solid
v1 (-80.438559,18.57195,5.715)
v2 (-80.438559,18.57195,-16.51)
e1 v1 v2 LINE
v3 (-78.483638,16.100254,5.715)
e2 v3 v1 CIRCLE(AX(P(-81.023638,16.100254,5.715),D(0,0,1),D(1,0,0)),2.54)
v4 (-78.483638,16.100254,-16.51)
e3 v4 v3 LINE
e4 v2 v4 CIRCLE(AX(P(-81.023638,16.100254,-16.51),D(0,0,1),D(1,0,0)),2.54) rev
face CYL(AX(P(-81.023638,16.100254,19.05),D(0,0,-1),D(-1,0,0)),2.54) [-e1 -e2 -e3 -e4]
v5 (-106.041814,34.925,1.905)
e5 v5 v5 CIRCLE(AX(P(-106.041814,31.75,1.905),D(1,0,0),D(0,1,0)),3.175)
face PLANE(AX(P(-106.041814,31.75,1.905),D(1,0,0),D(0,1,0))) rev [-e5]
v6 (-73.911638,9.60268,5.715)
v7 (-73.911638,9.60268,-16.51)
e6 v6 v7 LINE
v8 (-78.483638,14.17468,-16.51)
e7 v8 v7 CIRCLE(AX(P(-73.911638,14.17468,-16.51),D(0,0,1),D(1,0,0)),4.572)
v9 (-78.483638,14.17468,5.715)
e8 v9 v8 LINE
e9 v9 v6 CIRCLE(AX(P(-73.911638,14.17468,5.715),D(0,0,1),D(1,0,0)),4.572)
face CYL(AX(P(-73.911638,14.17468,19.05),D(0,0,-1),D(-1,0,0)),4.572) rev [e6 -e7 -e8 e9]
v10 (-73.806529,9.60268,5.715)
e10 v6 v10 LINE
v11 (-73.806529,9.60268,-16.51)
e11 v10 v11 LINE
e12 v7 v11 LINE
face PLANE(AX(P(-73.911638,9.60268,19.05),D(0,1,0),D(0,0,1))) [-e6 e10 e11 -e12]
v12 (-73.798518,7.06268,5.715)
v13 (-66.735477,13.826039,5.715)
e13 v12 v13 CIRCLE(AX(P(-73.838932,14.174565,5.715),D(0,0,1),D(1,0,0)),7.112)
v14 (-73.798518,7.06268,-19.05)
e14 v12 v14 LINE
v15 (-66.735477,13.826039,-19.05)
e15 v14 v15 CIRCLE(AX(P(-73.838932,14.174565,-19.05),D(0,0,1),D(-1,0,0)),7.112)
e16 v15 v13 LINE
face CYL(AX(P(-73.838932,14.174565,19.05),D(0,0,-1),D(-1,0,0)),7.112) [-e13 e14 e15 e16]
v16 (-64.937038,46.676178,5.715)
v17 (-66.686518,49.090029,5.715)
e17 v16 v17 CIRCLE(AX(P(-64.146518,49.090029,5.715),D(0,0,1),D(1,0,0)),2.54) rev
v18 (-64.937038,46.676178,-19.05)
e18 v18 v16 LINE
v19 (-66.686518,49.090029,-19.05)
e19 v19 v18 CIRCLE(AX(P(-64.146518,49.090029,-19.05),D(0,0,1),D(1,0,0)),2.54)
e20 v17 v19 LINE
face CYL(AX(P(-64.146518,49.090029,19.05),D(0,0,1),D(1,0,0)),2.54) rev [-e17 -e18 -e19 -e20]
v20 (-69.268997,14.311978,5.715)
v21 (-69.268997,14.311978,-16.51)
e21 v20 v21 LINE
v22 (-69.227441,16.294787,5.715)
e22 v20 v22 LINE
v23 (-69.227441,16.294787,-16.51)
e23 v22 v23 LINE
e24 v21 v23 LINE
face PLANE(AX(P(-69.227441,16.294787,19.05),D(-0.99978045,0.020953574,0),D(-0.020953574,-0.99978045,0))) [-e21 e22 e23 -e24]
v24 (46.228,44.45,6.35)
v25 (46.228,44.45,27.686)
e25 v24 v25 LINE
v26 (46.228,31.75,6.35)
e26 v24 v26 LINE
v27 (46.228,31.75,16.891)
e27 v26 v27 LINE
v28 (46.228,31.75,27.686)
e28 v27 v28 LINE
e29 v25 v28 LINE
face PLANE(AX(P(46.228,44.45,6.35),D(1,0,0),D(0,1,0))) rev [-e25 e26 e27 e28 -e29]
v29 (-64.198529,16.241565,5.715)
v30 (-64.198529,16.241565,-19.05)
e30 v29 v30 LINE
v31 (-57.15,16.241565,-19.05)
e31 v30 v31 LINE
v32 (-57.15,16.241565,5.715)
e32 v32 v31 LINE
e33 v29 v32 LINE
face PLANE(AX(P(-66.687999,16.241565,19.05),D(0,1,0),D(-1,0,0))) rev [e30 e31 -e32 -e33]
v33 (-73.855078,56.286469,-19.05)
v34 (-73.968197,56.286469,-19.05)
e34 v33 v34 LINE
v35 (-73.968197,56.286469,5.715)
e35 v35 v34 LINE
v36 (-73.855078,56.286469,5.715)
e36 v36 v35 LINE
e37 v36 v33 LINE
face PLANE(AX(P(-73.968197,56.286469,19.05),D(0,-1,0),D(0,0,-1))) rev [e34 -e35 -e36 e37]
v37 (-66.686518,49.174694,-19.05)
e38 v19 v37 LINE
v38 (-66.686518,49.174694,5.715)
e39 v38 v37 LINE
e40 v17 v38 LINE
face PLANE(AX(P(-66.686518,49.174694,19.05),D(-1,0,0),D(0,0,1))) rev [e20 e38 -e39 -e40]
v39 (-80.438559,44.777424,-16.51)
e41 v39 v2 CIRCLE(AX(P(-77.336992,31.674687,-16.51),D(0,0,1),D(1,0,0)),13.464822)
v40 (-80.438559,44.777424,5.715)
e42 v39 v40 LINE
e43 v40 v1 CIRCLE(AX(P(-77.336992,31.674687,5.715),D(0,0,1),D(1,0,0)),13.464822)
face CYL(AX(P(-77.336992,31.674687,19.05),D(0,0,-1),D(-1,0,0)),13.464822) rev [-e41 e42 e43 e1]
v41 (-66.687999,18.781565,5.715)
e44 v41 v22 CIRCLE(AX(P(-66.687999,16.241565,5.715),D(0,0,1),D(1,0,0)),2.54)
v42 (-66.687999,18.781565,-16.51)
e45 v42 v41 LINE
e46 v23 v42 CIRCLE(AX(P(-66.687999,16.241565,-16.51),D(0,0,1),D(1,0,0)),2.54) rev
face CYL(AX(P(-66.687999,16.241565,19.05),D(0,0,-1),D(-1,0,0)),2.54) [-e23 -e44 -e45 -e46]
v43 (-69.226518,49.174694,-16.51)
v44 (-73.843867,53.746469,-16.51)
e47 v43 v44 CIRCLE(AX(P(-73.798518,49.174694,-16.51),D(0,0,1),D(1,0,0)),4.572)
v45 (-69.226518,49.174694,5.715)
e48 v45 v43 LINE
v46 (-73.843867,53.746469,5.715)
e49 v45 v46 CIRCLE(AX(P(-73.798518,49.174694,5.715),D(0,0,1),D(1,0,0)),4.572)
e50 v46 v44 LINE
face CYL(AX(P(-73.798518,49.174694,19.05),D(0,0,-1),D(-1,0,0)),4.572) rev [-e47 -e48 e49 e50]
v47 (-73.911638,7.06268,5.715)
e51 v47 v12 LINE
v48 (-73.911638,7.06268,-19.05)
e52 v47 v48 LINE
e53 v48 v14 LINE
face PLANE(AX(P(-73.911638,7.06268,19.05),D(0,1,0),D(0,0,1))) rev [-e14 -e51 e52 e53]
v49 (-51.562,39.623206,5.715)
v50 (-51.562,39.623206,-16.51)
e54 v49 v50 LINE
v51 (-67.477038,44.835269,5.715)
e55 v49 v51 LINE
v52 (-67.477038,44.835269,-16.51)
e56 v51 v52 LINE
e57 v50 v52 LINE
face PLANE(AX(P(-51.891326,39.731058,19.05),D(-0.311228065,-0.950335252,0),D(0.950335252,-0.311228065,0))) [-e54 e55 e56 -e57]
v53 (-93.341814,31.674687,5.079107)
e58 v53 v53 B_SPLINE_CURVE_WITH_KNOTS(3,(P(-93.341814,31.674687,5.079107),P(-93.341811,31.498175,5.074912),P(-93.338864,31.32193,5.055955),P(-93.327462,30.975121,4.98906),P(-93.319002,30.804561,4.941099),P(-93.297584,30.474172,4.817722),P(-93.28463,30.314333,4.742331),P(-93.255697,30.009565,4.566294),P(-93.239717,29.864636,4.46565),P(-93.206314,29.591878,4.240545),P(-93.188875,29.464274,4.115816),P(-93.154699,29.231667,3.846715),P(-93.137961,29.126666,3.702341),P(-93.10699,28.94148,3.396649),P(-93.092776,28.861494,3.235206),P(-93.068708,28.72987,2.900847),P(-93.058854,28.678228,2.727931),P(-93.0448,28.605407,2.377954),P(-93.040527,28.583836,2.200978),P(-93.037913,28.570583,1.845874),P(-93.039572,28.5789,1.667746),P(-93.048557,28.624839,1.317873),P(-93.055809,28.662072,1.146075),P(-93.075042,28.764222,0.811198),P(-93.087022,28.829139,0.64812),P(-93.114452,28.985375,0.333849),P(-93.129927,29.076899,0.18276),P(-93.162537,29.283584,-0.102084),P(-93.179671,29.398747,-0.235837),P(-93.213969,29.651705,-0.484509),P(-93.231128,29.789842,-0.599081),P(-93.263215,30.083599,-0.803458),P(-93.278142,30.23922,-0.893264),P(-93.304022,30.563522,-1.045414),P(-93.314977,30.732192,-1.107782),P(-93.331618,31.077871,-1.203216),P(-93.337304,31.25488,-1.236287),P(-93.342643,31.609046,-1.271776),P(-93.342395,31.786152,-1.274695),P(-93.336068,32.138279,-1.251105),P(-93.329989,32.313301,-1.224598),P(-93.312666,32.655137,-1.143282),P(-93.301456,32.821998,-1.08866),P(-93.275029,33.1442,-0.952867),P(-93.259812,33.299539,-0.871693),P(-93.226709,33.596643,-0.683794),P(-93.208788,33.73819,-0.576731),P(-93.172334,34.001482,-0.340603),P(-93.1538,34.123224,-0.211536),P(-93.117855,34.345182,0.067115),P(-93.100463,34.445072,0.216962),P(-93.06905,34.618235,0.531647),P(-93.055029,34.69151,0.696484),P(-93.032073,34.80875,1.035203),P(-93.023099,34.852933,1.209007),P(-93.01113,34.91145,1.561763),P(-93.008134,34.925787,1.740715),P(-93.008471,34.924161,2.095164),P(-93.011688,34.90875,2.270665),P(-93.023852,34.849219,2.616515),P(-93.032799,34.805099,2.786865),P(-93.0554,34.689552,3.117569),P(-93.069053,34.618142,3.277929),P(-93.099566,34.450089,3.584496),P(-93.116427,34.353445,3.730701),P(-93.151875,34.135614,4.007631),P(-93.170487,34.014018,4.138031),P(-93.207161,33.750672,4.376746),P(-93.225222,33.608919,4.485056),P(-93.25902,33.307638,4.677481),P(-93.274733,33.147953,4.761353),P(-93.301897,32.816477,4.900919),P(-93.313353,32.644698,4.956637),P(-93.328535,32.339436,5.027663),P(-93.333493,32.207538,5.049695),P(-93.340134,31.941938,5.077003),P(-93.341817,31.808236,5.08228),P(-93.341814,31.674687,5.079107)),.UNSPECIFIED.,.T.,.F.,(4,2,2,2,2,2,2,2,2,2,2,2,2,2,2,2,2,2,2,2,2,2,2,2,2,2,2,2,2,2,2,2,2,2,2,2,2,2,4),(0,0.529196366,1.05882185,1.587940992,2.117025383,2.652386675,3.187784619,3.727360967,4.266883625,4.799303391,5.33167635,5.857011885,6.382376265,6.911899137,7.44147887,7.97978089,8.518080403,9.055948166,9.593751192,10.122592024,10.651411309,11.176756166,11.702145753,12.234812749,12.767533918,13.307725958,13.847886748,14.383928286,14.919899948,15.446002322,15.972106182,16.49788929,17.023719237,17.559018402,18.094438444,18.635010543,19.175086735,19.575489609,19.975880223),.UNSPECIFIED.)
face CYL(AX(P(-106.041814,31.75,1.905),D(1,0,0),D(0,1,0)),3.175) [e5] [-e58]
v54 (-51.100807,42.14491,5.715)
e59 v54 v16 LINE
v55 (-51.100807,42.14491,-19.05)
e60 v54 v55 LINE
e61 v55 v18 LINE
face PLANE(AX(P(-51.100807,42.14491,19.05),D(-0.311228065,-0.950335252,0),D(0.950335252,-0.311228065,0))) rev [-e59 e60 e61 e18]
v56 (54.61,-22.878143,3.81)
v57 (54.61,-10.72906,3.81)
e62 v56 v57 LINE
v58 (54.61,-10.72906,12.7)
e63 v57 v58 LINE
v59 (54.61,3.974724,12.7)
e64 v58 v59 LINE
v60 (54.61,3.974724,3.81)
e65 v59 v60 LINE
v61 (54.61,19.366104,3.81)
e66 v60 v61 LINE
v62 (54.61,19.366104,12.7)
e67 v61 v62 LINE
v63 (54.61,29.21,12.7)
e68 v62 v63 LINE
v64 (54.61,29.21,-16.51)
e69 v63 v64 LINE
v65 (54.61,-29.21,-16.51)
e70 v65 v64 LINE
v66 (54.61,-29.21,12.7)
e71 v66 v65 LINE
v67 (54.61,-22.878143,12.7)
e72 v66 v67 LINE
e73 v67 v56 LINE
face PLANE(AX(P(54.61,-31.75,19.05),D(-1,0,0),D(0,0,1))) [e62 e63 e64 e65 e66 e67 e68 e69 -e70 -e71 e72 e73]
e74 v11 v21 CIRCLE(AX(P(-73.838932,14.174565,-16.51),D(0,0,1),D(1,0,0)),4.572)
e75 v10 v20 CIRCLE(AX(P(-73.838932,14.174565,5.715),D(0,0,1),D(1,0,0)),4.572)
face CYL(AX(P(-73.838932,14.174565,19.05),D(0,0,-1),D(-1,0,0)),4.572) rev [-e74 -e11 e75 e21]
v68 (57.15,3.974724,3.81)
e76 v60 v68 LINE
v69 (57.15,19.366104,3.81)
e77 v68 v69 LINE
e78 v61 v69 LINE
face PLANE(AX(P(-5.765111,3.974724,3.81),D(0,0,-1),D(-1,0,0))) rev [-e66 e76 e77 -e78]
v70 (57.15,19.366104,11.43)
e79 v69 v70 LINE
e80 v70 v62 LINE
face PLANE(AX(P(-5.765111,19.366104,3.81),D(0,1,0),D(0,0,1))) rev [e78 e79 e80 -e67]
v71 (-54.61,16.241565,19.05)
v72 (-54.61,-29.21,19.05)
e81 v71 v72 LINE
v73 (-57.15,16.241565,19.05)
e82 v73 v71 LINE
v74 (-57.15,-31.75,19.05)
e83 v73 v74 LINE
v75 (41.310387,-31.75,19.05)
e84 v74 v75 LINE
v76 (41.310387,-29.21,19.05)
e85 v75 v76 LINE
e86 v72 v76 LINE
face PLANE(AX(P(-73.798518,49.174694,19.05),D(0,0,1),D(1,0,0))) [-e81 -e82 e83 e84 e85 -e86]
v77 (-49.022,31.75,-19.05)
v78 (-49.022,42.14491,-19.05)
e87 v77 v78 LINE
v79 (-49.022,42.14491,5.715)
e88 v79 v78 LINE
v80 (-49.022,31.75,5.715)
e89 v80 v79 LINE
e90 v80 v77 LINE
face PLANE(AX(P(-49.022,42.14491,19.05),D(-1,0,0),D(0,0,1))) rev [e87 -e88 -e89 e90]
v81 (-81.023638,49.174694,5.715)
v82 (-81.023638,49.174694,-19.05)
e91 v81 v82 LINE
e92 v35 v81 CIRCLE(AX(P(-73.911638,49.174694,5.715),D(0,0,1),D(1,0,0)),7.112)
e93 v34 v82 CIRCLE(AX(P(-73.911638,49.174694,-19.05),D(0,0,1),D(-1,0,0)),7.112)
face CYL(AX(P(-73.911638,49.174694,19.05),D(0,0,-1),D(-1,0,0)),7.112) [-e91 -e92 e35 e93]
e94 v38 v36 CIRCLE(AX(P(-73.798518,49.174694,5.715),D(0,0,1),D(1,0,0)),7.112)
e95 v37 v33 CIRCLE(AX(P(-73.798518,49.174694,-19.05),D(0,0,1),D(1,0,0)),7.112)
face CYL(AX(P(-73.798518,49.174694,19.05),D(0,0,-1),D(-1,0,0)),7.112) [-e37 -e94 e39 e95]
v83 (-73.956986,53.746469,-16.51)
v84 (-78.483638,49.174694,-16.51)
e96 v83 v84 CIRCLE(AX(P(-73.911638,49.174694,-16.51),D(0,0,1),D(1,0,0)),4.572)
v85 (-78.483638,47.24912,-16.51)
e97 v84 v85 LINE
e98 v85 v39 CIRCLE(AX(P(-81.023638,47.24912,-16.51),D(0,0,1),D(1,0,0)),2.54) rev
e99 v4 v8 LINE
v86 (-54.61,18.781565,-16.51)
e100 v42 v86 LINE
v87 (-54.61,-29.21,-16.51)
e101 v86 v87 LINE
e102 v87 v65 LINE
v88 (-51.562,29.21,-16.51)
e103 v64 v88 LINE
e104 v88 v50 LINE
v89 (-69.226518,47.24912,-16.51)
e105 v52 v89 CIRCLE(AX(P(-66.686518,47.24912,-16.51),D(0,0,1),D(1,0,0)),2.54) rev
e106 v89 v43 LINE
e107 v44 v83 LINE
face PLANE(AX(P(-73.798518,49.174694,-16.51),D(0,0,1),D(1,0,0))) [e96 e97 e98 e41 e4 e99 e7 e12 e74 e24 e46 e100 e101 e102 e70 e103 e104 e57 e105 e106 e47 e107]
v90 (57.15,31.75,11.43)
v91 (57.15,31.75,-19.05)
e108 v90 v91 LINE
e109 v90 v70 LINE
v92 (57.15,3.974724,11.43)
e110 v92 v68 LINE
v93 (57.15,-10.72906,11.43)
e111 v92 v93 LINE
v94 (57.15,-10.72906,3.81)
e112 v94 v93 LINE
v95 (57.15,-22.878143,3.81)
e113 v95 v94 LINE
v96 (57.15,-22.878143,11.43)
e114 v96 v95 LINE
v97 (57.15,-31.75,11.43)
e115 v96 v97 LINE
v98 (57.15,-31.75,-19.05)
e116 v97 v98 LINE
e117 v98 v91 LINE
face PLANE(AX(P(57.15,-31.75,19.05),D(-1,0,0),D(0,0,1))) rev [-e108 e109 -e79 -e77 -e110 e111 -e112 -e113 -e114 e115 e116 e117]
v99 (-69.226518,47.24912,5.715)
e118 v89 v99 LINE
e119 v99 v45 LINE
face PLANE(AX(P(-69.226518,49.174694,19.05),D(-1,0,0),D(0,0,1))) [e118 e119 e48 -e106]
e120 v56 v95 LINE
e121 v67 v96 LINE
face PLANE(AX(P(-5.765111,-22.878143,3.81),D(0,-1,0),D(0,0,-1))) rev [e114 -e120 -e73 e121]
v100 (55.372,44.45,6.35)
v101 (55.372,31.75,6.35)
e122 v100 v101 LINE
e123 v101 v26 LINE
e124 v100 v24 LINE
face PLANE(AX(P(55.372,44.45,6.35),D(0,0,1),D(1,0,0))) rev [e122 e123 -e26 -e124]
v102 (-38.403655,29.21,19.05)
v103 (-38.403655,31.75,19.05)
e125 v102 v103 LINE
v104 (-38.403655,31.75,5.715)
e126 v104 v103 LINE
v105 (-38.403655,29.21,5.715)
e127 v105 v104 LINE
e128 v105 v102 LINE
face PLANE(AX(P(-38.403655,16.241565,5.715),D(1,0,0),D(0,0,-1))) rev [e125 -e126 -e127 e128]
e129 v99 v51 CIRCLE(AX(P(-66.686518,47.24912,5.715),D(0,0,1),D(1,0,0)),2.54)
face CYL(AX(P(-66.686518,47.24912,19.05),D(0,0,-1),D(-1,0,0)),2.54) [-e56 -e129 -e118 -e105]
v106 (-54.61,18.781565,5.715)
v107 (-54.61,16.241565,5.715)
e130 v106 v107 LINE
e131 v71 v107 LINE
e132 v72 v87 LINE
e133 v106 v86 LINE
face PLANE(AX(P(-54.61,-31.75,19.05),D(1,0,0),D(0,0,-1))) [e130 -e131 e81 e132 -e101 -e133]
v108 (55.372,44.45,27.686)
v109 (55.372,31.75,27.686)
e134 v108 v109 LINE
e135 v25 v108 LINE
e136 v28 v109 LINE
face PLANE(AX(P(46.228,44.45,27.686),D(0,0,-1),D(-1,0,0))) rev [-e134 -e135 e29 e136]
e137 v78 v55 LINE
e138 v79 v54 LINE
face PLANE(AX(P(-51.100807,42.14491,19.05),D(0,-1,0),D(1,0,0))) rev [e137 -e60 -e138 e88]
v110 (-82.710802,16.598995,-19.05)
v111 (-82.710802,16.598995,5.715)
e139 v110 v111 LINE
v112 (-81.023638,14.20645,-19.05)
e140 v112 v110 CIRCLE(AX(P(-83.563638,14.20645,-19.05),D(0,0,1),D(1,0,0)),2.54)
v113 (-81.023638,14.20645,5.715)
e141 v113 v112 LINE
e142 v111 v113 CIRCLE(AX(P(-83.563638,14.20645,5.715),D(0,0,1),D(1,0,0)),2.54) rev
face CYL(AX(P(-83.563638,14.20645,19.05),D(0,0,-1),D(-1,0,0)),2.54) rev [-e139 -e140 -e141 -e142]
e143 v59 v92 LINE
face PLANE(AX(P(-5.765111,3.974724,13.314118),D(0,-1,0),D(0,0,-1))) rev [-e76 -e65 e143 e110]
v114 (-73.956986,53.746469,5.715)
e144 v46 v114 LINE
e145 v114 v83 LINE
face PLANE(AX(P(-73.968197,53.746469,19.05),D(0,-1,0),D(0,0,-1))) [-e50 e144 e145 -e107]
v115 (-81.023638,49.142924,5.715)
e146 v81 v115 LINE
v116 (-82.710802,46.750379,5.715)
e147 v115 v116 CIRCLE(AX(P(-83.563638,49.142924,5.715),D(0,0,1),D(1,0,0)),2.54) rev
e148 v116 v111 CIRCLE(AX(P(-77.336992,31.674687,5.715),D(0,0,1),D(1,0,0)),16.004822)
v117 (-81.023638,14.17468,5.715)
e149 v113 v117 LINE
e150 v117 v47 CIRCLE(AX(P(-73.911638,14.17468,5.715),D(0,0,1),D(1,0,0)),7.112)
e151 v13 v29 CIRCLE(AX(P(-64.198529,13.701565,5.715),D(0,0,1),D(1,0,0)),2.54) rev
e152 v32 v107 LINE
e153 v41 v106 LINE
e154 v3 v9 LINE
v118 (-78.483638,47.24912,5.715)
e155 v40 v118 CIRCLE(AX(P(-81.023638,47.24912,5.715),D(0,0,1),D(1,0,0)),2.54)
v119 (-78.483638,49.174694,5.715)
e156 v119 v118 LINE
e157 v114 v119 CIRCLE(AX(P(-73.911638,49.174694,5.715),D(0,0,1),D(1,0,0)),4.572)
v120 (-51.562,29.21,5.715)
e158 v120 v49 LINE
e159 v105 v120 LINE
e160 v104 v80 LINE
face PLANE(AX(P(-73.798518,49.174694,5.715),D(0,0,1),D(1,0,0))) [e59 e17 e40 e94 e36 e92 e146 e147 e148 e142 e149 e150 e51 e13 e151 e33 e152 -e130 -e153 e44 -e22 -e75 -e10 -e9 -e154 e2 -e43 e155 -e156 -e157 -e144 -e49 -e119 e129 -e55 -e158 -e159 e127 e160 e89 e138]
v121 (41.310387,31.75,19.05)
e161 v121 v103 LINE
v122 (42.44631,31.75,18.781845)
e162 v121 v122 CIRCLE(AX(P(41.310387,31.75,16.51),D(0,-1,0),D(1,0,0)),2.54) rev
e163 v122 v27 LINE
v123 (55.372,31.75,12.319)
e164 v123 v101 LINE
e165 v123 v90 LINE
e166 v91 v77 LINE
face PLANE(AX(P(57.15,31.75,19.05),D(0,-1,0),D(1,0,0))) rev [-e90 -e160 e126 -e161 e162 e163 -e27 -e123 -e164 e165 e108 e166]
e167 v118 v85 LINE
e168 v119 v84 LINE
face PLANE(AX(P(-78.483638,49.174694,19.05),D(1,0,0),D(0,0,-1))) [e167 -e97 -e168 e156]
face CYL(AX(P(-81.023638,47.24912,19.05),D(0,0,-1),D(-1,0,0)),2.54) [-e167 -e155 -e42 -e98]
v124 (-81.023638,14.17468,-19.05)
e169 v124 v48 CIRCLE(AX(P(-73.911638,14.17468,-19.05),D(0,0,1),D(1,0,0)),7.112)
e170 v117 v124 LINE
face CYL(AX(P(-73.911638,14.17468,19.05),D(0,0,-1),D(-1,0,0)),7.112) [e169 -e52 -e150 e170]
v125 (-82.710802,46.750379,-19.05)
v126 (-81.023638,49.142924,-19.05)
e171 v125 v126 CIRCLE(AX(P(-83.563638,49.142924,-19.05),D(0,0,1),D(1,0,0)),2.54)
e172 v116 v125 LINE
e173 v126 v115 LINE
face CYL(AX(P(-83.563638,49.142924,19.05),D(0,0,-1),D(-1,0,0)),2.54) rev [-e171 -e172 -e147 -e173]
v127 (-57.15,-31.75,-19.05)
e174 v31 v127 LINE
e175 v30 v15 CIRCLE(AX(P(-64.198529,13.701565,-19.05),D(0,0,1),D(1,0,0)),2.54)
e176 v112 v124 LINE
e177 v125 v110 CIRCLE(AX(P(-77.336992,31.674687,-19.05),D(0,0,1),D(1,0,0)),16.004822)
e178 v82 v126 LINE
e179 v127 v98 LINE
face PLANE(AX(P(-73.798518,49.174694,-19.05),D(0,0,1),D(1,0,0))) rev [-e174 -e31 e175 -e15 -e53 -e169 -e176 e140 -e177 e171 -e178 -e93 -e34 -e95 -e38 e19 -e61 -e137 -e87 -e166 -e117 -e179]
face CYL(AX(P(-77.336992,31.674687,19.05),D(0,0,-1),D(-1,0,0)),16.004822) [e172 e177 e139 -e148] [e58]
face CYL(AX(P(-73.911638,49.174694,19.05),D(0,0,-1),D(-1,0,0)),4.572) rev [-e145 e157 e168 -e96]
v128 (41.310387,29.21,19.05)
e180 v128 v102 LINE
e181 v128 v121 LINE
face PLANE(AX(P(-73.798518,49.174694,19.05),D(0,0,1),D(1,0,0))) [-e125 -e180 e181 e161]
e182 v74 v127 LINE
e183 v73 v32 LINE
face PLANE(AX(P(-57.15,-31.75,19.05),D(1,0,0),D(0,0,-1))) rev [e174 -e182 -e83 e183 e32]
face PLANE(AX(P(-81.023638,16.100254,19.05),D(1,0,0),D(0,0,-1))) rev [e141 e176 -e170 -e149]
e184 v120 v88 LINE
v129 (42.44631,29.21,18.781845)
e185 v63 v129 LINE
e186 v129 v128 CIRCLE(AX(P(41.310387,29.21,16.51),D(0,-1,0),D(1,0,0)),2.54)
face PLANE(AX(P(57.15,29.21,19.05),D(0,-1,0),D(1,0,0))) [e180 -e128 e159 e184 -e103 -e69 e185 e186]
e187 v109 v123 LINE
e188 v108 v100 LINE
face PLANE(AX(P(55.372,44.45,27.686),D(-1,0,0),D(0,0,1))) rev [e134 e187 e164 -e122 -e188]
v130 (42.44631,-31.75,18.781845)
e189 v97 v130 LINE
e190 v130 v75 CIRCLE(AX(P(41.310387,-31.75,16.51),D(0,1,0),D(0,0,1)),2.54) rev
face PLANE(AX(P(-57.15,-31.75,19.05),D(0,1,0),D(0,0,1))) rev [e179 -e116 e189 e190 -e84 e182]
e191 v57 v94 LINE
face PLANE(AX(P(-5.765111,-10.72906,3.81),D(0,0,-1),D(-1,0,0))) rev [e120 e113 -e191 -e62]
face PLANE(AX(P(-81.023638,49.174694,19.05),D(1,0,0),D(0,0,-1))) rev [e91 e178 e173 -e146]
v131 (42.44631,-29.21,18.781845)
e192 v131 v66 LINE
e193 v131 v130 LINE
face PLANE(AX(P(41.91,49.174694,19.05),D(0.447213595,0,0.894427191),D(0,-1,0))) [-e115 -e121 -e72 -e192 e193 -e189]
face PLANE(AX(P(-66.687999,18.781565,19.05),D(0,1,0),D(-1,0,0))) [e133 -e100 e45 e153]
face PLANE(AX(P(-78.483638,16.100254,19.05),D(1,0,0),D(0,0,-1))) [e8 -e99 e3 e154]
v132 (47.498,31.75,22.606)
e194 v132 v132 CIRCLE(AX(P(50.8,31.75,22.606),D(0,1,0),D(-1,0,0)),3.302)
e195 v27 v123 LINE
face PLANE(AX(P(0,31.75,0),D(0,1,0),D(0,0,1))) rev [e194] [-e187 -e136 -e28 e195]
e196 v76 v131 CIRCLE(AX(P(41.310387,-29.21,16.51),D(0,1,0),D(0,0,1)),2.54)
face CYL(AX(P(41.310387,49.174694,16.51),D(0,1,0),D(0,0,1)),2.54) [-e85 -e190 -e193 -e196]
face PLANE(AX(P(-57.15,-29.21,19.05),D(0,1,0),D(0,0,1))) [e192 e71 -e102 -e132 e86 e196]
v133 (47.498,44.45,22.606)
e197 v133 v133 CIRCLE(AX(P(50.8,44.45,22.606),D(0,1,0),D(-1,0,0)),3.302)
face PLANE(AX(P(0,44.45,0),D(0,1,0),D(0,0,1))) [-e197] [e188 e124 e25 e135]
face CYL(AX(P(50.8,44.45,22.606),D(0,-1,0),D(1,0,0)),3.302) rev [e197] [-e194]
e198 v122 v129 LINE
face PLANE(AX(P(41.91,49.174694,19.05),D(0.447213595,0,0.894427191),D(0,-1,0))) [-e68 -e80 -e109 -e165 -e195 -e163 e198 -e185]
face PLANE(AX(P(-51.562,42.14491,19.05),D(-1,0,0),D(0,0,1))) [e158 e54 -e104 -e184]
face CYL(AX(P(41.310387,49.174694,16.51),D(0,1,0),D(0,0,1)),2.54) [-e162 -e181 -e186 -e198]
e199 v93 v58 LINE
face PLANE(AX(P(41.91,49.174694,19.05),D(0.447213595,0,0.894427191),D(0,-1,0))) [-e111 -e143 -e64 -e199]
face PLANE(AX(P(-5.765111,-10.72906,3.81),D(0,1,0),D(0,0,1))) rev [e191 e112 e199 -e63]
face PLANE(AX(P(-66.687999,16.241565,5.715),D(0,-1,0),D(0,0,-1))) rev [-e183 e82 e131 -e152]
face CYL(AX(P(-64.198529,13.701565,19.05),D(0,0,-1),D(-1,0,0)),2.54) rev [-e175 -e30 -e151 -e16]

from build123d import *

# Parameters (mm, degrees)
BOSS_EXTRUDE1_DEPTH      = 19.05
SHELL3_START             = -16.51
SHELL3_DEPTH             = 35.56
SKETCH7_W                = 9.144
SKETCH7_H                = 21.336
SKETCH7_R                = 3.302
BOSS_EXTRUDE3_DEPTH      = 12.7
CHAMFER1_SIZE            = 15.24
CHAMFER1_SIZE_2          = 7.62
CUT_EXTRUDE4_DEPTH       = 13.335
BOSS_EXTRUDE4_DEPTH      = 1.27
BOSS_EXTRUDE4_DEPTH_BACK = 12.7
SKETCH9_R                = 3.175
CUT_EXTRUDE5_DEPTH       = 2.54
FILLET1_R                = 2.54
FILLET2_R                = 2.54


# Read off the part's stored shape, not the designer's step: Shell3
with BuildPart() as part:
    # Sketch1 → Boss-Extrude1 (new, symmetric)
    with BuildSketch(Plane.XY):
        with BuildLine():
            Line((-57.15, -31.75), (57.15, -31.75))
            Line((57.15, -31.75), (57.15, 31.75))
            Line((57.15, 31.75), (-49.022, 31.75))
            Line((-49.022, 31.75), (-49.022, 42.144910037))
            Line((-49.022, 42.144910037), (-51.100806987, 42.144910037))
            Line((-51.100806987, 42.144910037), (-66.686518268, 47.249120101))
            Line((-66.686518268, 47.249120101), (-66.686518268, 49.174694101))
            ThreePointArc((-66.686518268, 49.174694101), (-68.789611639, 54.223594812), (-73.855077994, 56.286469196))
            Line((-73.855077994, 56.286469196), (-73.968197446, 56.286469196))
            ThreePointArc((-73.968197446, 56.286469196), (-78.960538431, 54.18360073), (-81.02363772, 49.174694101))
            Line((-81.02363772, 49.174694101), (-81.02363772, 47.249120101))
            ThreePointArc((-81.02363772, 47.249120101), (-93.341814168, 31.674687064), (-81.02363772, 16.100254027))
            Line((-81.02363772, 16.100254027), (-81.02363772, 14.174680027))
            ThreePointArc((-81.02363772, 14.174680027), (-78.940581148, 9.145736599), (-73.91163772, 7.062680027))
            Line((-73.91163772, 7.062680027), (-73.798518268, 7.062680027))
            ThreePointArc((-73.798518268, 7.062680027), (-68.74596031, 9.210475671), (-66.728346573, 14.31641367))
            Line((-66.728346573, 14.31641367), (-66.687998915, 16.24156491))
            Line((-66.687998915, 16.24156491), (-57.15, 16.24156491))
            Line((-57.15, 16.24156491), (-57.15, -31.75))
        make_face()
    extrude(amount=BOSS_EXTRUDE1_DEPTH, both=True)

    # Shell3 outline → Shell3 (cut)
    with BuildSketch(Plane.XY.offset(SHELL3_START)):
        with BuildLine():
            Line((54.61, 29.21), (-51.562, 29.21))
            Line((-51.562, 29.21), (-51.562, 39.623206475))
            Line((-51.562, 39.623206475), (-69.226518268, 45.408211104))
            Line((-69.226518268, 45.408211104), (-69.226518268, 49.174694101))
            ThreePointArc((-69.226518268, 49.174694101), (-70.581699125, 52.423579848), (-73.843866737, 53.746469196))
            Line((-73.843866737, 53.746469196), (-73.956986189, 53.746469196))
            ThreePointArc((-73.956986189, 53.746469196), (-77.160523467, 52.391513244), (-78.48363772, 49.174694101))
            Line((-78.48363772, 49.174694101), (-78.48363772, 45.090596577))
            ThreePointArc((-78.48363772, 45.090596577), (-90.801814168, 31.674687064), (-78.48363772, 18.258777551))
            Line((-78.48363772, 18.258777551), (-78.48363772, 14.174680027))
            ThreePointArc((-78.48363772, 14.174680027), (-77.144529924, 10.941787823), (-73.91163772, 9.602680027))
            Line((-73.91163772, 9.602680027), (-73.806528971, 9.602680027))
            ThreePointArc((-73.806528971, 9.602680027), (-70.546554352, 11.002273539), (-69.268997314, 14.311978137))
            Line((-69.268997314, 14.311978137), (-69.175322928, 18.78156491))
            Line((-69.175322928, 18.78156491), (-54.61, 18.78156491))
            Line((-54.61, 18.78156491), (-54.61, -29.21))
            Line((-54.61, -29.21), (54.61, -29.21))
            Line((54.61, -29.21), (54.61, 29.21))
        make_face()
    extrude(amount=SHELL3_DEPTH, mode=Mode.SUBTRACT)

    # Sketch7 → Boss-Extrude3 (add)
    with BuildSketch(Plane(origin=(0, 31.75, 0), x_dir=(1, 0, 0), z_dir=(0, 1, 0))):
        with Locations((50.8, -17.018)):
            Rectangle(SKETCH7_W, SKETCH7_H)
        with Locations(Location((50.8, -22.606, 0), (0, 0, 180))):
            Circle(SKETCH7_R, mode=Mode.SUBTRACT)
    extrude(amount=BOSS_EXTRUDE3_DEPTH)

    # Chamfer1
    # the kernel refuses this chamfer: 15.24, 7.62 mm, written as the material it takes off along each edge
    with BuildSketch(Plane(origin=(57.15, -71.218992037, 19.05), x_dir=(-0.9998508956747117, 0, 0.017268075123668167), z_dir=(0, 1, 0))) as chamfer1_piece_1:
        Polygon((CHAMFER1_SIZE * 0.999850895675, -CHAMFER1_SIZE * 0.0172680751237), (-CHAMFER1_SIZE_2 * 0.0172680751237, -CHAMFER1_SIZE_2 * 0.999850895675), (0, 0), align=None)
    extrude(amount=102.968992037, mode=Mode.SUBTRACT)

    # Sketch8 → Cut-Extrude4 (cut)
    with BuildSketch(Plane.XY.offset(19.05)):
        with BuildLine():
            Line((-66.610527579, 49.002799892), (-66.610527579, 47.279305102))
            Line((-66.610527579, 47.279305102), (-51.100806987, 42.144910037))
            Line((-51.100806987, 42.144910037), (-38.403655113, 42.144910037))
            Line((-38.403655113, 42.144910037), (-38.403655113, 16.24156491))
            Line((-38.403655113, 16.24156491), (-66.687998915, 16.24156491))
            Line((-66.687998915, 16.24156491), (-66.726931852, 14.174565202))
            ThreePointArc((-66.726931852, 14.174565202), (-67.907528646, 10.164808506), (-71.108849398, 7.477150977))
            ThreePointArc((-71.108849398, 7.477150977), (-77.894512097, 8.119410548), (-81.02363772, 14.174680027))
            Line((-81.02363772, 14.174680027), (-81.02363772, 16.100254027))
            ThreePointArc((-81.02363772, 16.100254027), (-93.341814168, 31.674687064), (-81.02363772, 47.249120101))
            Line((-81.02363772, 47.249120101), (-81.02363772, 49.174694101))
            ThreePointArc((-81.02363772, 49.174694101), (-80.441084846, 51.993712411), (-78.788861502, 54.350912042))
            ThreePointArc((-78.788861502, 54.350912042), (-70.907499507, 55.757912789), (-66.610527579, 49.002799892))
        make_face()
    extrude(amount=-CUT_EXTRUDE4_DEPTH, mode=Mode.SUBTRACT)

    # Sketch9 → Boss-Extrude4 (add, two sides: drawn at the far end of the back side and taken through both)
    with BuildSketch(Plane(origin=(-93.341814168, 0, 0), x_dir=(0, 0, -1), z_dir=(1, 0, 0)).offset(-BOSS_EXTRUDE4_DEPTH_BACK)):
        with Locations(Location((-1.905, 31.75, 0), (0, 0, 90))):
            Circle(SKETCH9_R)
    extrude(amount=BOSS_EXTRUDE4_DEPTH + BOSS_EXTRUDE4_DEPTH_BACK)

    # Sketch10 → Cut-Extrude5 (cut)
    with BuildSketch(Plane(origin=(57.15, 0, 0), x_dir=(0, 0, -1), z_dir=(1, 0, 0))):
        Polygon((-19.05, -29.21), (-13.314117838, -29.21), (-13.314117838, -22.878143144), (-3.81, -22.878143144), (-3.81, -10.729059706), (-13.314117838, -10.729059706), (-13.314117838, 3.974723841), (-3.81, 3.974723841), (-3.81, 19.366104348), (-13.314117838, 19.366104348), (-13.314117838, 29.21), (-19.05, 29.21), align=None)
    extrude(amount=-CUT_EXTRUDE5_DEPTH, mode=Mode.SUBTRACT)

    # Fillet1
    fillet1_edges = [part.edges().sort_by_distance(p)[0] for p in [
        (-81.02363772, 16.100254027, -6.6675),
        (-78.48363772, 18.258777551, -5.3975),
        (-69.175322928, 18.78156491, -5.3975),
        (-66.687998915, 16.24156491, -6.6675),
        (-69.226518268, 45.408211104, -5.3975),
        (-66.686518268, 47.249120101, -6.6675),
        (-81.02363772, 47.249120101, -6.6675),
        (-78.48363772, 45.090596577, -5.3975),
    ]]
    fillet(fillet1_edges, radius=FILLET1_R)

    # Fillet2
    fillet2_edges = [part.edges().sort_by_distance(p)[0] for p in [
        (41.91, 30.48, 19.05),
        (41.91, -30.48, 19.05),
    ]]
    fillet(fillet2_edges, radius=FILLET2_R)


solid = part.part
